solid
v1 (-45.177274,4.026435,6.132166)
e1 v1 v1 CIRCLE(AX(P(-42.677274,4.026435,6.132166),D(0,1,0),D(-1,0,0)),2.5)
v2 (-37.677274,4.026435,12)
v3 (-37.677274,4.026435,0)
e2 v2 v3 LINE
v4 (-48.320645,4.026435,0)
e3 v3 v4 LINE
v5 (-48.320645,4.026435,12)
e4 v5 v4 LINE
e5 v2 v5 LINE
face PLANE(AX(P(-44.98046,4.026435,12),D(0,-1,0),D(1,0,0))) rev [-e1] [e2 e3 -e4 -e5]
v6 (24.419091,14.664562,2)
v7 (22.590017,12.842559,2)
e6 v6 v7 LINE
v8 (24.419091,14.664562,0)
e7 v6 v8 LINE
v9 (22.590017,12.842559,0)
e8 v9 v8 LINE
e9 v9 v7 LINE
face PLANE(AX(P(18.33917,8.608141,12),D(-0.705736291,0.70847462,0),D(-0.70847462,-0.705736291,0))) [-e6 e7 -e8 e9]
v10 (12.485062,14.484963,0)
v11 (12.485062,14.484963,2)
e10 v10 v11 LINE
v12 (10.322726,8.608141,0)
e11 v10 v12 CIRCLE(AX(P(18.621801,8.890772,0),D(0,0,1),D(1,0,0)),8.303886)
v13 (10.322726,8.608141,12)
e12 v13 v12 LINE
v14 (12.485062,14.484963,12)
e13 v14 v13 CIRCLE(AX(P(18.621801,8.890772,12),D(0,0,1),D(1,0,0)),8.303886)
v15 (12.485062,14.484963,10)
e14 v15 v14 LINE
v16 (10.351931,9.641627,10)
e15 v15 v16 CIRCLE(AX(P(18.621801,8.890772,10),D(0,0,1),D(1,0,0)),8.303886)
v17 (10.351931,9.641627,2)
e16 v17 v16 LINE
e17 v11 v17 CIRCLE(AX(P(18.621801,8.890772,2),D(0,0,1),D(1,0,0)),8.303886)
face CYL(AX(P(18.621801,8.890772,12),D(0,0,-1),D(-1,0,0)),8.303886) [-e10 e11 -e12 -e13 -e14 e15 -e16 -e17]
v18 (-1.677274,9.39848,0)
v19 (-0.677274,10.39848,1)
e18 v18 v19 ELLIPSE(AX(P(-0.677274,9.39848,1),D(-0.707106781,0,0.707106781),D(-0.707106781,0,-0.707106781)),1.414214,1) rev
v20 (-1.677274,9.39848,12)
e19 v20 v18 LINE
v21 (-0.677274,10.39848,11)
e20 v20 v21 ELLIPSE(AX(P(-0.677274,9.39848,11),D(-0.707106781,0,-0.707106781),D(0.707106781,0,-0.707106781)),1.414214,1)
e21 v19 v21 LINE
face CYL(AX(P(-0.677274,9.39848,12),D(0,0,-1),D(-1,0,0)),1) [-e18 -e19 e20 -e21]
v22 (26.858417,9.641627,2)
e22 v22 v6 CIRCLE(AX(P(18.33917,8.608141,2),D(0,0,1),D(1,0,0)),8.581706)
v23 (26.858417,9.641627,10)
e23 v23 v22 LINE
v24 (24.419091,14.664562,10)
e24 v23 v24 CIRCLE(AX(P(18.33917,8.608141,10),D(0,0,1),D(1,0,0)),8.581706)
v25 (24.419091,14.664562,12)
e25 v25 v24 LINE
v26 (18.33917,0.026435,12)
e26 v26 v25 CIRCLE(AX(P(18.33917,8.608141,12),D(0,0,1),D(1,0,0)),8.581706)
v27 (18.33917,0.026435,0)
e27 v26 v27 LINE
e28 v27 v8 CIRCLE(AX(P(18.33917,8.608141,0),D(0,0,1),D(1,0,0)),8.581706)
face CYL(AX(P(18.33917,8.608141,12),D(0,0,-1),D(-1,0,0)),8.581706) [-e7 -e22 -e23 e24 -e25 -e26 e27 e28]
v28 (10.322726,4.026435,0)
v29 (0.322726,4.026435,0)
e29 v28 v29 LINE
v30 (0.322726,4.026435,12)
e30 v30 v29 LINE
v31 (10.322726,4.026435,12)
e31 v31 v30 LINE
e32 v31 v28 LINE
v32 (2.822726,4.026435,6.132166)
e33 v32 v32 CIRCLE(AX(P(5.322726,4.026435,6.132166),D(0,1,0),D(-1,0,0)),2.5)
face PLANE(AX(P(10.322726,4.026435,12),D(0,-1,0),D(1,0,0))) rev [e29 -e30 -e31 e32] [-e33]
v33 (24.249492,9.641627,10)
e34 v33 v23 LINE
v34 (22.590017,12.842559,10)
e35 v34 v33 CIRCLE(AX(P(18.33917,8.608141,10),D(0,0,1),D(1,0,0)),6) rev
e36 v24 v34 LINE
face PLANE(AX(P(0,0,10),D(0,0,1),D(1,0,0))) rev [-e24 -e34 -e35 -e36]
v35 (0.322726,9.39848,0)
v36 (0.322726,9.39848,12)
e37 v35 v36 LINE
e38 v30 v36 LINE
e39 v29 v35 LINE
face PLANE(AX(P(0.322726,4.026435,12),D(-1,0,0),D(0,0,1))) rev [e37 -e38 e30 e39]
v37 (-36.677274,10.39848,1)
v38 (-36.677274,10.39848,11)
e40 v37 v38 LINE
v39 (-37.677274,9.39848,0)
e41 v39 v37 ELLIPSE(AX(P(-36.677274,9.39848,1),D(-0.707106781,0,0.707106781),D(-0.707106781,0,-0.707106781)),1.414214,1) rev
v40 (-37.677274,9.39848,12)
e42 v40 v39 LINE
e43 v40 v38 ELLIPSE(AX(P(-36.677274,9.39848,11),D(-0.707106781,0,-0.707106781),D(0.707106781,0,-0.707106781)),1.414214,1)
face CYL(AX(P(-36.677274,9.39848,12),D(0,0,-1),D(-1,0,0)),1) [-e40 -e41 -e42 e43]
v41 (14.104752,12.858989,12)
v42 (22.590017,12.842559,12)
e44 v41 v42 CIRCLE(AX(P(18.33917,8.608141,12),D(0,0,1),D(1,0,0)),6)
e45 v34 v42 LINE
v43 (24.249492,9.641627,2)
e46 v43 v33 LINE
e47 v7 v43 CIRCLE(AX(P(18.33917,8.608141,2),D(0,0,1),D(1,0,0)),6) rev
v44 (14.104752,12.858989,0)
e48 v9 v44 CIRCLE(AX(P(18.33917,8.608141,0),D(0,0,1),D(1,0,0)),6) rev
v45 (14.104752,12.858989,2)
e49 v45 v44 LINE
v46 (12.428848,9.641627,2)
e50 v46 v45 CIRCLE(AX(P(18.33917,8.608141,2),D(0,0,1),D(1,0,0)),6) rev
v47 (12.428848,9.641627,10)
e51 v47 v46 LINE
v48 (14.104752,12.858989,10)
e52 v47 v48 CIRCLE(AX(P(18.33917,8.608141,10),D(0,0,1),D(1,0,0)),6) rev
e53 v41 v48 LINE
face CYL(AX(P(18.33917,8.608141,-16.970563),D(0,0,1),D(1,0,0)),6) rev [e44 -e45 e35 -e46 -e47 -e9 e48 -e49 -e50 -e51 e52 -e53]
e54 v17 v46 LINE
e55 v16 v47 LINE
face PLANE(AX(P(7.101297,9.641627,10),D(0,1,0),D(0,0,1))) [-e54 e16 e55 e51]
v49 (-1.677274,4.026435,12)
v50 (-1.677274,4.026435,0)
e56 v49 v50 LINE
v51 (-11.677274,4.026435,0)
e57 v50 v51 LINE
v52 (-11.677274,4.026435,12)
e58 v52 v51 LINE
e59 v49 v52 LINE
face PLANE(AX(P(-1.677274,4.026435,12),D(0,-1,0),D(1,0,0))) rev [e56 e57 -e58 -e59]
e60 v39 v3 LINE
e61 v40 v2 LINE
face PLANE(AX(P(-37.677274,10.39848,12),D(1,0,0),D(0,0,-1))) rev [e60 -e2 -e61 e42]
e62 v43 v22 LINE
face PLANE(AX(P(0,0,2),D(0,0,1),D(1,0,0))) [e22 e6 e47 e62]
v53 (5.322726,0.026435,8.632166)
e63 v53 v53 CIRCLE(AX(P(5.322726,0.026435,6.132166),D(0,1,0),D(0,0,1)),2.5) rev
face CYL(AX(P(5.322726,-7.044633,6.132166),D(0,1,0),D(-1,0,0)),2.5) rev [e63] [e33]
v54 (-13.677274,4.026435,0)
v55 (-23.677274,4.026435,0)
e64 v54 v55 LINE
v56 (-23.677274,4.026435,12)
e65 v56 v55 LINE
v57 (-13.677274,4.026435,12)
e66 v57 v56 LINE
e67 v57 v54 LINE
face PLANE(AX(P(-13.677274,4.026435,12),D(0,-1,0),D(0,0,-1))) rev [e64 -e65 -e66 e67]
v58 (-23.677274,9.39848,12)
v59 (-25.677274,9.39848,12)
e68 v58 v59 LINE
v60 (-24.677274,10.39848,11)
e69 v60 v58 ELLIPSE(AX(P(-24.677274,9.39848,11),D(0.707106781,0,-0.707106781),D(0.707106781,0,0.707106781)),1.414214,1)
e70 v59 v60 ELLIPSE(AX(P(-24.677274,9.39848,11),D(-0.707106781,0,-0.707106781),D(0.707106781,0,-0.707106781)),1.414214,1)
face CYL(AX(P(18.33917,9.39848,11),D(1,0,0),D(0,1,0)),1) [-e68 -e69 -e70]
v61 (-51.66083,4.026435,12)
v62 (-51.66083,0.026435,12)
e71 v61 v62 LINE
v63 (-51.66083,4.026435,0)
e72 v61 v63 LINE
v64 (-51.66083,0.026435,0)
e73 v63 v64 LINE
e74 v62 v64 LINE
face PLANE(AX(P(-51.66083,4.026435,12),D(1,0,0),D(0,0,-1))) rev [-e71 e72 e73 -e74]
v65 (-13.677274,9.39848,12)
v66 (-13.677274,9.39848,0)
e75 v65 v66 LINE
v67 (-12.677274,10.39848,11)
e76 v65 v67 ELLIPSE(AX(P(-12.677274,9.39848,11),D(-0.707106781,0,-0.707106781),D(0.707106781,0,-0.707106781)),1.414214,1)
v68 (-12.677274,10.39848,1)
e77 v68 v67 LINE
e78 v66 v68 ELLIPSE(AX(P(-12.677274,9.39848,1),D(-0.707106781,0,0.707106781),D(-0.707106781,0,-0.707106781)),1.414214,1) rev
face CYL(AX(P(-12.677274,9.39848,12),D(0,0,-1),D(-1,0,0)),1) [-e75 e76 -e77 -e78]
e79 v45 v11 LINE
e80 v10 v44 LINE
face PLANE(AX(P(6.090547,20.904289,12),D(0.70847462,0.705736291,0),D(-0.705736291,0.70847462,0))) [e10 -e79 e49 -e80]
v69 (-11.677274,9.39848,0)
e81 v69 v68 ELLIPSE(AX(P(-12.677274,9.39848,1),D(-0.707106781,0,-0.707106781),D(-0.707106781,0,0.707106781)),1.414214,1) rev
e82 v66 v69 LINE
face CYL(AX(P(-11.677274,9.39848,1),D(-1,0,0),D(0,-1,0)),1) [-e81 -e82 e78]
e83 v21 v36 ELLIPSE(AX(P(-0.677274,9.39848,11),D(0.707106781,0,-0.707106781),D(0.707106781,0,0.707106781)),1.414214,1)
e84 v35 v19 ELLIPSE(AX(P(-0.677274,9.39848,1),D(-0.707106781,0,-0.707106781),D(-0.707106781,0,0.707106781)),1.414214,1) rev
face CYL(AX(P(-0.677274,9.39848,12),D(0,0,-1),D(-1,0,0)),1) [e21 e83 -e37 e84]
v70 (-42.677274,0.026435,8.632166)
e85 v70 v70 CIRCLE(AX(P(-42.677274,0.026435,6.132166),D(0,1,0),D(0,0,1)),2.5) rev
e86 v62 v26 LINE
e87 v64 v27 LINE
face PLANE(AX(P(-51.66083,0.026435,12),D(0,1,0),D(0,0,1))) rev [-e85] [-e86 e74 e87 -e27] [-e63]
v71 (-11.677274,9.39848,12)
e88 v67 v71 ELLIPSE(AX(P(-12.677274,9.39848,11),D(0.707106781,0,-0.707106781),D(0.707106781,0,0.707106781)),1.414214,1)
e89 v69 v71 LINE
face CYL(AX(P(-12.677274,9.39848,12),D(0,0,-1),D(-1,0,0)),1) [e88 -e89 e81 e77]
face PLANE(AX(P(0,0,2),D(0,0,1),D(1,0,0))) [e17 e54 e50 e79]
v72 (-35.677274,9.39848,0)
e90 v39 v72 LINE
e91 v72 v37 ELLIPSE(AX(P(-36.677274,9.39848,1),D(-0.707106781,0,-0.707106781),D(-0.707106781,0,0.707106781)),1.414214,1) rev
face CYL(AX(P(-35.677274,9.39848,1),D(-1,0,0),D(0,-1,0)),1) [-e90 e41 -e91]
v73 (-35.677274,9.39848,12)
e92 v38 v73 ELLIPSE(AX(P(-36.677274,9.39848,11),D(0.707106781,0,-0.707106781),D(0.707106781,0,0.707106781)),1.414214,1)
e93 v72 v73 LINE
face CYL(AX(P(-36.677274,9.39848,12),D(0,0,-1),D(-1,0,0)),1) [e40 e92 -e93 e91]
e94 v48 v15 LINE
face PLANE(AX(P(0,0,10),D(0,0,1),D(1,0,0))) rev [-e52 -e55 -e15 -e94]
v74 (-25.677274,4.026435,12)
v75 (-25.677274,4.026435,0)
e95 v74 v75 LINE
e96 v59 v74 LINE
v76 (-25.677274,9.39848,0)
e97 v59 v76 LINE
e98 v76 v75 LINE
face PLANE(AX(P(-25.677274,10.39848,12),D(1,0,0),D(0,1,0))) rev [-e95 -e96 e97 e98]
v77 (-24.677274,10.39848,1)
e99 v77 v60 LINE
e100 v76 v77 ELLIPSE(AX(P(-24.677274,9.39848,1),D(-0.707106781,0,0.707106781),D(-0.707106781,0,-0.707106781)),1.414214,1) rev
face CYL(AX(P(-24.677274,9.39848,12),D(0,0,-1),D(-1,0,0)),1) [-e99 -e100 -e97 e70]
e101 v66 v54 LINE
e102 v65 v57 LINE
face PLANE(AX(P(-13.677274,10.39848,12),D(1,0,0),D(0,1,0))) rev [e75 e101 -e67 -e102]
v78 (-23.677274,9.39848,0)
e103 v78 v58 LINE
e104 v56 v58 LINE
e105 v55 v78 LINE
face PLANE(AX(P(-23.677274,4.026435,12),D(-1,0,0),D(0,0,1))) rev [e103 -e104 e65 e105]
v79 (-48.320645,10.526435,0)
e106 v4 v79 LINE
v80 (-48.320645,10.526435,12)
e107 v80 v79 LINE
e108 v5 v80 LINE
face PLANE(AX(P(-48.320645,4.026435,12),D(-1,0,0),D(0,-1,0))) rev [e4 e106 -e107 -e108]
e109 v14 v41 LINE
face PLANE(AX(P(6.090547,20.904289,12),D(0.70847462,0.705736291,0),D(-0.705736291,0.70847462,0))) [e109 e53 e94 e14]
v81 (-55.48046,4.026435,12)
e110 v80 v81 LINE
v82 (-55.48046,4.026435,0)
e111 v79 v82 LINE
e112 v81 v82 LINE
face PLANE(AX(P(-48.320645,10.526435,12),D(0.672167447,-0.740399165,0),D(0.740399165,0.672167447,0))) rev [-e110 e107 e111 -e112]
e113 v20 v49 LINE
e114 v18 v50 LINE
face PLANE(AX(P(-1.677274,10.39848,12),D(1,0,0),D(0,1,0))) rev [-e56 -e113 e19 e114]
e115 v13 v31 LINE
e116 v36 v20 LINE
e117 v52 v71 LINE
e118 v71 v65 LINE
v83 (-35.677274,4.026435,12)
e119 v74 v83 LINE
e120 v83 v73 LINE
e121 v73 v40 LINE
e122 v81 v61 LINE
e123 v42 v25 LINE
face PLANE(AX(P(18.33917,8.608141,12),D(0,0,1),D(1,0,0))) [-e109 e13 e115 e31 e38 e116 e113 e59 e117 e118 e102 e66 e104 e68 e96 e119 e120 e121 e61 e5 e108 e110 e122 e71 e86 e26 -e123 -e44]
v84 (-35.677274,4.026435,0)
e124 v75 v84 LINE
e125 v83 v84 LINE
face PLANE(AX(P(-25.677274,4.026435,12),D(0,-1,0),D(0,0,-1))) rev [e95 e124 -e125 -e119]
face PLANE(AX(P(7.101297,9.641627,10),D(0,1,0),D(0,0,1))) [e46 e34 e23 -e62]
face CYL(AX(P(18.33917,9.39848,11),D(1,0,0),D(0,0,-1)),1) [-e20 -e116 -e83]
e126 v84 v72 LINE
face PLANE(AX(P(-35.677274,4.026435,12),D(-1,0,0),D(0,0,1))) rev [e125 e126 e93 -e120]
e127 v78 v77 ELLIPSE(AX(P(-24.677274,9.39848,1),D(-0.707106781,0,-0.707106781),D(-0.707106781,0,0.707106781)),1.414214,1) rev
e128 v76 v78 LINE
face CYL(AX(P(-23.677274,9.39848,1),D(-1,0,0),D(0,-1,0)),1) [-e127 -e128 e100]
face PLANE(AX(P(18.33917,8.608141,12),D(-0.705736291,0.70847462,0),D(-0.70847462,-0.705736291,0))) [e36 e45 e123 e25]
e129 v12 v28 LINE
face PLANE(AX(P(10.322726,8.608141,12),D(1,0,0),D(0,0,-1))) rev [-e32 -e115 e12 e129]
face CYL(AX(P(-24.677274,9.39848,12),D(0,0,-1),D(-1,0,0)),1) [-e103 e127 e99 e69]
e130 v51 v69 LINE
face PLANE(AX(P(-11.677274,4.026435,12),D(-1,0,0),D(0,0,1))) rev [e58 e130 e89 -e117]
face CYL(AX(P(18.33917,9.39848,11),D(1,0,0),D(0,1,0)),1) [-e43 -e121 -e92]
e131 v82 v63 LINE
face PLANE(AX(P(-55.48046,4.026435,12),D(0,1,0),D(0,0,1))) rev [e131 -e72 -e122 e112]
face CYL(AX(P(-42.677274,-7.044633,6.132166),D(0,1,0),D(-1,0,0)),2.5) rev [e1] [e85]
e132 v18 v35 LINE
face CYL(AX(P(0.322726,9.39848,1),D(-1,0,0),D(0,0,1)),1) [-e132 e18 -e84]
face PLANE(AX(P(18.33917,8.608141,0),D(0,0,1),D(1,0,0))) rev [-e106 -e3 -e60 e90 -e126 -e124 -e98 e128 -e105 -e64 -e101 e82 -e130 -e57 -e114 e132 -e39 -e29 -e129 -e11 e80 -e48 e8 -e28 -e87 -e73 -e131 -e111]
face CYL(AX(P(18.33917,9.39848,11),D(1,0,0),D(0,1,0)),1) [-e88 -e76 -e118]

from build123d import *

# Parameters (mm, degrees)
BOSS_EXTRU_1_DEPTH      = 12
ESQUISSE2_R             = 6
ENL_V_MAT_EXTRU_1_DEPTH = 12
ESQUISSE5_W             = 22.19086736
ESQUISSE5_H             = 9.756409295
ENL_V_MAT_EXTRU_2_DEPTH = 8
ENL_V_MAT_EXTRU_3_DEPTH = 60.309125122
CONG_1_R                = 1
ESQUISSE7_R             = 2.5
ENL_V_MAT_EXTRU_4_DEPTH = 4


with BuildPart() as part:
    # Esquisse1 → Boss.-Extru.1 (new body)
    with BuildSketch(Plane.XY):
        with BuildLine():
            Line((-48.320645407, 10.526434737), (-55.480460412, 4.026434737))
            Line((-55.480460412, 4.026434737), (-51.660830402, 4.026434737))
            Line((-51.660830402, 4.026434737), (-51.660830402, 0.026434737))
            Line((-51.660830402, 0.026434737), (18.339169598, 0.026434737))
            ThreePointArc((18.339169598, 0.026434737), (26.920875662, 8.608140801), (18.339169598, 17.189846865))
            ThreePointArc((18.339169598, 17.189846865), (12.553618084, 14.559253744), (10.32272561, 8.608140801))
            Line((10.32272561, 8.608140801), (10.32272561, 4.026434737))
            Line((10.32272561, 4.026434737), (0.32272561, 4.026434737))
            Line((0.32272561, 4.026434737), (0.32272561, 10.398479958))
            Line((0.32272561, 10.398479958), (-1.67727439, 10.398479958))
            Line((-1.67727439, 10.398479958), (-1.67727439, 4.026434737))
            Line((-1.67727439, 4.026434737), (-11.67727439, 4.026434737))
            Line((-11.67727439, 4.026434737), (-11.67727439, 10.398479958))
            Line((-11.67727439, 10.398479958), (-13.67727439, 10.398479958))
            Line((-13.67727439, 10.398479958), (-13.67727439, 4.026434737))
            Line((-13.67727439, 4.026434737), (-23.67727439, 4.026434737))
            Line((-23.67727439, 4.026434737), (-23.67727439, 10.398479958))
            Line((-23.67727439, 10.398479958), (-25.67727439, 10.398479958))
            Line((-25.67727439, 10.398479958), (-25.67727439, 4.026434737))
            Line((-25.67727439, 4.026434737), (-35.67727439, 4.026434737))
            Line((-35.67727439, 4.026434737), (-35.67727439, 10.398479958))
            Line((-35.67727439, 10.398479958), (-37.67727439, 10.398479958))
            Line((-37.67727439, 10.398479958), (-37.67727439, 4.026434737))
            Line((-37.67727439, 4.026434737), (-44.980460412, 4.026434737))
            Line((-44.980460412, 4.026434737), (-48.320645407, 4.026434737))
            Line((-48.320645407, 4.026434737), (-48.320645407, 10.526434737))
        make_face()
    extrude(amount=BOSS_EXTRU_1_DEPTH)

    # Esquisse2 → Enlèv. mat.-Extru.1 (cut)
    with BuildSketch(Plane.XY.offset(12)):
        with Locations((18.339169598, 8.608140801)):
            Circle(ESQUISSE2_R)
    extrude(amount=-ENL_V_MAT_EXTRU_1_DEPTH, mode=Mode.SUBTRACT)

    # Esquisse5 → Enlèv. mat.-Extru.2 (cut)
    with BuildSketch(Plane.XY.offset(2)):
        with Locations((18.196730475, 14.519832028)):
            Rectangle(ESQUISSE5_W, ESQUISSE5_H)
    extrude(amount=ENL_V_MAT_EXTRU_2_DEPTH, mode=Mode.SUBTRACT)

    # Esquisse6 → Enlèv. mat.-Extru.3 (cut, through all)
    with BuildSketch(Plane.XY):
        Polygon((6.09054696, 20.904289339), (18.339169598, 8.608140801), (30.683028441, 20.904289339), align=None)
    extrude(amount=ENL_V_MAT_EXTRU_3_DEPTH, mode=Mode.SUBTRACT)

    # Congé1
    cong_1_edges = [part.edges().sort_by_distance(p)[0] for p in [
        (-36.67727439, 10.398479958, 0),
        (-0.67727439, 10.398479958, 12),
        (-24.67727439, 10.398479958, 0),
        (-12.67727439, 10.398479958, 0),
        (-0.67727439, 10.398479958, 0),
        (-12.67727439, 10.398479958, 12),
        (-37.67727439, 10.398479958, 6),
        (-35.67727439, 10.398479958, 6),
        (-25.67727439, 10.398479958, 6),
        (-23.67727439, 10.398479958, 6),
        (-13.67727439, 10.398479958, 6),
        (-11.67727439, 10.398479958, 6),
        (-1.67727439, 10.398479958, 6),
        (0.32272561, 10.398479958, 6),
        (-24.67727439, 10.398479958, 12),
        (-36.67727439, 10.398479958, 12),
    ]]
    fillet(cong_1_edges, radius=CONG_1_R - 0.0001)  # a hair under: the kernel refuses the full size

    # Esquisse7 → Enlèv. mat.-Extru.4 (cut)
    with BuildSketch(Plane(origin=(0, 4.026434737, 0), x_dir=(1, 0, 0), z_dir=(0, 1, 0))):
        with Locations(Location((-42.67727439, -6.1321655, 0), (0, 0, 180))):
            Circle(ESQUISSE7_R)
        with Locations(Location((5.32272561, -6.1321655, 0), (0, 0, 180))):
            Circle(ESQUISSE7_R)
    extrude(amount=-ENL_V_MAT_EXTRU_4_DEPTH, mode=Mode.SUBTRACT)


solid = part.part
